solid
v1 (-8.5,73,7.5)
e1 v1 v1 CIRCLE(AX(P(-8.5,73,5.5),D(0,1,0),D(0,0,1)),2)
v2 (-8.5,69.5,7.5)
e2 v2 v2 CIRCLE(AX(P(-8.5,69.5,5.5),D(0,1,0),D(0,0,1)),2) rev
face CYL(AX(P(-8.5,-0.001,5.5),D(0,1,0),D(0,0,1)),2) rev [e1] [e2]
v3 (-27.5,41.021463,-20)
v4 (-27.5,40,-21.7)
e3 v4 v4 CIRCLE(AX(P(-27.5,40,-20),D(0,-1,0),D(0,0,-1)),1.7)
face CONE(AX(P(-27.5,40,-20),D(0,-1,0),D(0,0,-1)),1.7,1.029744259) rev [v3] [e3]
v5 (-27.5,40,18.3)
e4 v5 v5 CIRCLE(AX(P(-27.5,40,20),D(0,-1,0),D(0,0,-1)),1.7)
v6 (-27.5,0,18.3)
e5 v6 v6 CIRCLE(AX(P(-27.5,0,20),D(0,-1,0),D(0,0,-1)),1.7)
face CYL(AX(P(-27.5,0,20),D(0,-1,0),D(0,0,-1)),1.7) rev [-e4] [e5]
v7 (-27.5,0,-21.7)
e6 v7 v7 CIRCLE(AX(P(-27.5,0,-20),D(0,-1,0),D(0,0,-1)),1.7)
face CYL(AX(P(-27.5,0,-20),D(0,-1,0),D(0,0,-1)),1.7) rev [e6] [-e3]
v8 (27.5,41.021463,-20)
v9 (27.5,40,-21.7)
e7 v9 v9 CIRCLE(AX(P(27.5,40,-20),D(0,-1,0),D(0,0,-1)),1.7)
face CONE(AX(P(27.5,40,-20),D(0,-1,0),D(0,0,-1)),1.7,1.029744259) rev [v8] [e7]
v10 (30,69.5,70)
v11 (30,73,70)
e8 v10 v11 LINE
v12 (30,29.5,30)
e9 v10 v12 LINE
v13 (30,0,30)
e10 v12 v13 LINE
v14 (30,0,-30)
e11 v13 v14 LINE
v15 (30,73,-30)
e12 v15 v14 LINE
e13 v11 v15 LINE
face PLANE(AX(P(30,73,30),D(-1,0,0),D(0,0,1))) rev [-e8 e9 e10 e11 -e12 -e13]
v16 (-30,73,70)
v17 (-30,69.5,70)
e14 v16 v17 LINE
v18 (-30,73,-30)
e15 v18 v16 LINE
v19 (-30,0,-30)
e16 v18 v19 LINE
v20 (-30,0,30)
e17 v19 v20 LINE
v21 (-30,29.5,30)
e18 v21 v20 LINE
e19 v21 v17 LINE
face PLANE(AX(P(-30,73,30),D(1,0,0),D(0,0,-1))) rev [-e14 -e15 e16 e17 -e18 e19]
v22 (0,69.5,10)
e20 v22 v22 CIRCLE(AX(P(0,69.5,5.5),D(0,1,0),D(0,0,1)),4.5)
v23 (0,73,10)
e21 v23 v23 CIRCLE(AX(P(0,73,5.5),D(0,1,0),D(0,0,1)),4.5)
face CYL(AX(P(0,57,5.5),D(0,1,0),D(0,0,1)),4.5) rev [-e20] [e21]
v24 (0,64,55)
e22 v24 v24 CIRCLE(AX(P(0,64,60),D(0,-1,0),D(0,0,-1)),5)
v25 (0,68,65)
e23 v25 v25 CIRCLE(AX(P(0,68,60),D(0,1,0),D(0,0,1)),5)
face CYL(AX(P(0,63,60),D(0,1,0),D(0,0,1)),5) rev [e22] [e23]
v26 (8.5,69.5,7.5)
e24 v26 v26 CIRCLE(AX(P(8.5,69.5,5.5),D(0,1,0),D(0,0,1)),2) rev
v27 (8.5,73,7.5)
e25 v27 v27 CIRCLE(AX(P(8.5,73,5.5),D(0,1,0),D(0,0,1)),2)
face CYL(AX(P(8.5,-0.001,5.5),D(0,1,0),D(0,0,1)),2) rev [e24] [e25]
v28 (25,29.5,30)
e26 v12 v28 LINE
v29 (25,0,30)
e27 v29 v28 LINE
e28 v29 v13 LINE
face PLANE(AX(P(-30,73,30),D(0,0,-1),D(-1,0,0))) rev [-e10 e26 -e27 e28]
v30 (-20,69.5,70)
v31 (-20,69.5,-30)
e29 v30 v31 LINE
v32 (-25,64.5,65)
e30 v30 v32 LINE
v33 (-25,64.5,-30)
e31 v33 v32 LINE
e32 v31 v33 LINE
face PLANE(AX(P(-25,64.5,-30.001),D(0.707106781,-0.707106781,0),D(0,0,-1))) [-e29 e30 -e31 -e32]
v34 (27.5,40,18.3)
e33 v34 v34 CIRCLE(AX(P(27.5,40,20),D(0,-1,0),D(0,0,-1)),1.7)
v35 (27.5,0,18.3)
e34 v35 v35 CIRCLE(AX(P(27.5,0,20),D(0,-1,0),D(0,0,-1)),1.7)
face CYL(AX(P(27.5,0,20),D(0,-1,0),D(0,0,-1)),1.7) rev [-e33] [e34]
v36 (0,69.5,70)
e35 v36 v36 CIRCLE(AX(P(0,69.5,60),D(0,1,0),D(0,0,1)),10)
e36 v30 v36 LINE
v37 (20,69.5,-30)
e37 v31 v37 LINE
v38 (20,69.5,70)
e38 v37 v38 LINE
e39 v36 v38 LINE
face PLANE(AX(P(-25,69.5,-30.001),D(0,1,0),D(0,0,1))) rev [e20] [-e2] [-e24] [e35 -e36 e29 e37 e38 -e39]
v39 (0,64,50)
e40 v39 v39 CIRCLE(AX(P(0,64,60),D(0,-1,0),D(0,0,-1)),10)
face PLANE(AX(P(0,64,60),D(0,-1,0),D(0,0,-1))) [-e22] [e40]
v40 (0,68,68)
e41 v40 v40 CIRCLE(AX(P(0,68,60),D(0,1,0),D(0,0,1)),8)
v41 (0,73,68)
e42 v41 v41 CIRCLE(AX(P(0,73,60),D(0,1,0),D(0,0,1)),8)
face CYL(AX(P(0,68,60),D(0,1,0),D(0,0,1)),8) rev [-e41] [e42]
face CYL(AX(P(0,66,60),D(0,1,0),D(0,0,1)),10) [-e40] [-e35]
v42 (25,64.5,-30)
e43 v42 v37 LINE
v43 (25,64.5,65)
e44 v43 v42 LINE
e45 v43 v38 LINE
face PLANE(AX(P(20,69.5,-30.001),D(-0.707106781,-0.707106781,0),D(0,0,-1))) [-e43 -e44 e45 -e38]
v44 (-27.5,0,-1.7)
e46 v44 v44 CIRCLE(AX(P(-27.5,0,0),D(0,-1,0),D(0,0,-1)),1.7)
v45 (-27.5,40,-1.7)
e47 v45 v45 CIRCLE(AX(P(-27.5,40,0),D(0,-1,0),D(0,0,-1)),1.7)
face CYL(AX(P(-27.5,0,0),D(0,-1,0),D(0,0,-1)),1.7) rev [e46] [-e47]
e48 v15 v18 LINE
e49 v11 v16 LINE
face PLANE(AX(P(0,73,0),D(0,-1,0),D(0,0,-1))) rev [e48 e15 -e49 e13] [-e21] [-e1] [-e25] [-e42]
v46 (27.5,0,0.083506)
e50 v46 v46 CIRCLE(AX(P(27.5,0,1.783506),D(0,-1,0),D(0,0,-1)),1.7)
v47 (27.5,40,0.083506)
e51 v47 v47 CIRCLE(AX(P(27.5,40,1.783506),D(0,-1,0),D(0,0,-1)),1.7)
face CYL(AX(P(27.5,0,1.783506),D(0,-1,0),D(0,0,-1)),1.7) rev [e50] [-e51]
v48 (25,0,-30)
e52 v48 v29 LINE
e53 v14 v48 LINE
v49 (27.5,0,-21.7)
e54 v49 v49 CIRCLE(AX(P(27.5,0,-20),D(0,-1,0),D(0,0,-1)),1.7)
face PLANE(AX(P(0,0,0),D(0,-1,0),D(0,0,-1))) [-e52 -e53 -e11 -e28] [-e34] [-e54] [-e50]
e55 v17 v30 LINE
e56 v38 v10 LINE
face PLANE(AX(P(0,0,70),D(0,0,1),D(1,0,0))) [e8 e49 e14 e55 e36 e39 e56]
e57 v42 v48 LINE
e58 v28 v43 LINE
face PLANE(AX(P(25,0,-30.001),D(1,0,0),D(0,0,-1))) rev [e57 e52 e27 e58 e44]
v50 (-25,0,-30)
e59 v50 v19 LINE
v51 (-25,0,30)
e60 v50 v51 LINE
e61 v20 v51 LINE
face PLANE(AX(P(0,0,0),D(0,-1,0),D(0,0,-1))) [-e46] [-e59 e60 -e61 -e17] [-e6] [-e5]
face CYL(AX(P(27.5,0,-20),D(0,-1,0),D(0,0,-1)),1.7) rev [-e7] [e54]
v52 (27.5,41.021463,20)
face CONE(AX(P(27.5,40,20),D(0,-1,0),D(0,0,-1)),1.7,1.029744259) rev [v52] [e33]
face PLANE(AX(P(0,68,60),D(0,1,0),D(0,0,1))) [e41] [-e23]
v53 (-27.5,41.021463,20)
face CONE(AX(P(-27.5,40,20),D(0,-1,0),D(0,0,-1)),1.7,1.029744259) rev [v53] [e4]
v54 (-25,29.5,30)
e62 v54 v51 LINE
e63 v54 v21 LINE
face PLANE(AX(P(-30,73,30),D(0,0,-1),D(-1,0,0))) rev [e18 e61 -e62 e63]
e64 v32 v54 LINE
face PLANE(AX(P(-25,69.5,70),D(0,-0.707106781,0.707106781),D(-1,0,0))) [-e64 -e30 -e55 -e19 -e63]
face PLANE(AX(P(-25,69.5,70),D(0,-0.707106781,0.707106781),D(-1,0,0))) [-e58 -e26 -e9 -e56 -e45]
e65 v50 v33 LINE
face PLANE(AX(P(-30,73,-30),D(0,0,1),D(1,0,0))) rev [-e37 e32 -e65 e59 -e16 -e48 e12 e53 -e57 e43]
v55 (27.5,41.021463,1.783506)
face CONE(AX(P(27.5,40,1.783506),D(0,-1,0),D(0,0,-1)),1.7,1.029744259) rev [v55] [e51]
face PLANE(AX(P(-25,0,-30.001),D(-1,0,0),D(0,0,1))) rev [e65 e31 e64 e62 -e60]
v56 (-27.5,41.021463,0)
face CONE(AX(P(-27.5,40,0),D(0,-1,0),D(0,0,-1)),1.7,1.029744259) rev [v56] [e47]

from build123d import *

# Parameters (mm, degrees)
CROQUIS1_W                       = 60
CROQUIS1_H                       = 60
SALIENTE_EXTRUIR1_DEPTH          = 73
CORTAR_EXTRUIR1_REACH            = 101.141
CROQUIS2_W                       = 50
CROQUIS2_H                       = 69.5
CORTAR_EXTRUIR2_REACH            = 86.433
CROQUIS3_R                       = 2
CHAFL_N1_SIZE                    = 5
TALADRO_DE_MARGEN_PARA_M31_D     = 3.4
TALADRO_DE_MARGEN_PARA_M31_DEPTH = 40
TALADRO_DE_MARGEN_PARA_M31_TIP   = 1.021463052
TALADRO_DE_MARGEN_PARA_M32_D     = 3.4
TALADRO_DE_MARGEN_PARA_M32_DEPTH = 40
TALADRO_DE_MARGEN_PARA_M32_TIP   = 1.021463052
TALADRO_DE_MARGEN_PARA_M33_D     = 3.4
TALADRO_DE_MARGEN_PARA_M33_DEPTH = 40
TALADRO_DE_MARGEN_PARA_M33_TIP   = 1.021463052
CROQUIS11_W                      = 60
CROQUIS11_H                      = 3.5
SALIENTE_EXTRUIR2_DEPTH          = 40
CHAFL_N2_SIZE                    = 40
CORTAR_EXTRUIR3_REACH            = 107.494
CROQUIS12_R                      = 2.5
CROQUIS14_R                      = 10
SALIENTE_EXTRUIR3_DEPTH          = 7
CROQUIS15_R                      = 10
SALIENTE_EXTRUIR4_DEPTH          = 2
CROQUIS13_R                      = 8
CORTAR_EXTRUIR5_DEPTH            = 5
CROQUIS16_R                      = 5
CORTAR_EXTRUIR6_DEPTH            = 5
CROQUIS17_R                      = 4.5
CORTAR_EXTRUIR7_DEPTH            = 16


with BuildPart() as part:
    # Croquis1 → Saliente-Extruir1 (new body)
    with BuildSketch(Plane(origin=(0, 0, 0), x_dir=(1, 0, 0), z_dir=(0, 1, 0))):
        Rectangle(CROQUIS1_W, CROQUIS1_H)
    extrude(amount=SALIENTE_EXTRUIR1_DEPTH)

    # Croquis2 → Cortar-Extruir1 (cut, up to next)
    with BuildSketch(Plane.XY.offset(30), mode=Mode.PRIVATE) as cortar_extruir1_sk1:
        with Locations((0, 34.75)):
            Rectangle(CROQUIS2_W, CROQUIS2_H)
    cortar_extruir1_tool1 = extrude(cortar_extruir1_sk1.sketch, amount=-CORTAR_EXTRUIR1_REACH, mode=Mode.PRIVATE) & part.part
    add(cortar_extruir1_tool1.solids().sort_by_distance((0, 34.75, 30))[0], mode=Mode.SUBTRACT)

    # Croquis3 → Cortar-Extruir2 (cut, up to next)
    with BuildSketch(Plane(origin=(0, 73, 0), x_dir=(1, 0, 0), z_dir=(0, 1, 0)), mode=Mode.PRIVATE) as cortar_extruir2_sk1:
        with Locations(Location((-8.5, -5.5, 0), (0, 0, 270))):
            Circle(CROQUIS3_R)
    cortar_extruir2_tool1 = extrude(cortar_extruir2_sk1.sketch, amount=-CORTAR_EXTRUIR2_REACH, mode=Mode.PRIVATE) & part.part
    # Croquis3 → Cortar-Extruir2 (cut, up to next)
    with BuildSketch(Plane(origin=(0, 73, 0), x_dir=(1, 0, 0), z_dir=(0, 1, 0)), mode=Mode.PRIVATE) as cortar_extruir2_sk2:
        with Locations(Location((8.5, -5.5, 0), (0, 0, 270))):
            Circle(CROQUIS3_R)
    cortar_extruir2_tool2 = extrude(cortar_extruir2_sk2.sketch, amount=-CORTAR_EXTRUIR2_REACH, mode=Mode.PRIVATE) & part.part
    add(cortar_extruir2_tool1.solids().sort_by_distance((-8.5, 73, 5.5))[0], mode=Mode.SUBTRACT)
    add(cortar_extruir2_tool2.solids().sort_by_distance((8.5, 73, 5.5))[0], mode=Mode.SUBTRACT)

    # Chaflán1
    chafl_n1_edges = [part.edges().sort_by_distance(p)[0] for p in [
        (-25, 69.5, 0),
        (25, 69.5, 0),
    ]]
    chamfer(chafl_n1_edges, length=CHAFL_N1_SIZE)

    # Taladro de margen para M31
    with Locations(Plane.XZ):
        with Locations((27.5, -20), (27.5, 20)):
            Hole(TALADRO_DE_MARGEN_PARA_M31_D / 2, depth=TALADRO_DE_MARGEN_PARA_M31_DEPTH)
            with Locations((0, 0, -(TALADRO_DE_MARGEN_PARA_M31_DEPTH + TALADRO_DE_MARGEN_PARA_M31_TIP / 2))):  # 118° drill point
                Cone(0, TALADRO_DE_MARGEN_PARA_M31_D / 2, TALADRO_DE_MARGEN_PARA_M31_TIP, mode=Mode.SUBTRACT)

    # Taladro de margen para M32
    with Locations(Plane.XZ):
        with Locations((-27.5, 20), (-27.5, -20)):
            Hole(TALADRO_DE_MARGEN_PARA_M32_D / 2, depth=TALADRO_DE_MARGEN_PARA_M32_DEPTH)
            with Locations((0, 0, -(TALADRO_DE_MARGEN_PARA_M32_DEPTH + TALADRO_DE_MARGEN_PARA_M32_TIP / 2))):  # 118° drill point
                Cone(0, TALADRO_DE_MARGEN_PARA_M32_D / 2, TALADRO_DE_MARGEN_PARA_M32_TIP, mode=Mode.SUBTRACT)

    # Taladro de margen para M33
    with Locations(Plane.XZ):
        with Locations((-27.5, 0), (27.5, 1.783505525)):
            Hole(TALADRO_DE_MARGEN_PARA_M33_D / 2, depth=TALADRO_DE_MARGEN_PARA_M33_DEPTH)
            with Locations((0, 0, -(TALADRO_DE_MARGEN_PARA_M33_DEPTH + TALADRO_DE_MARGEN_PARA_M33_TIP / 2))):  # 118° drill point
                Cone(0, TALADRO_DE_MARGEN_PARA_M33_D / 2, TALADRO_DE_MARGEN_PARA_M33_TIP, mode=Mode.SUBTRACT)

    # Croquis11 → Saliente-Extruir2 (add)
    with BuildSketch(Plane.XY.offset(30)):
        with Locations((0, 71.25)):
            Rectangle(CROQUIS11_W, CROQUIS11_H)
    extrude(amount=SALIENTE_EXTRUIR2_DEPTH)

    # Chaflán2
    # the kernel refuses this chamfer: 40 mm, written as the material it adds along each edge
    with BuildSketch(Plane(origin=(30, 69.5, 30), x_dir=(0, -0.9996219169112968, -0.027495876610586403), z_dir=(-1, 0, 0))) as chafl_n2_piece_1_section:
        Polygon((CHAFL_N2_SIZE * 0.999621916911, CHAFL_N2_SIZE * 0.0274958766106), (-CHAFL_N2_SIZE * 0.0274958766106, CHAFL_N2_SIZE * 0.999621916911), (0, 0), align=None)
    chafl_n2_piece_1 = extrude(amount=112.867319519, mode=Mode.PRIVATE)
    chafl_n2_piece_1 = split(chafl_n2_piece_1, bisect_by=Plane(origin=(25, 65.769230769, 48.134615385), z_dir=(1, 0, 0)), keep=Keep.TOP, mode=Mode.PRIVATE)
    add(chafl_n2_piece_1)
    with BuildSketch(Plane(origin=(132.867319519, 69.5, 30), x_dir=(0, -0.9996219169112968, -0.027495876610586403), z_dir=(-1, 0, 0))) as chafl_n2_piece_2_section:
        Polygon((CHAFL_N2_SIZE * 0.999621916911, CHAFL_N2_SIZE * 0.0274958766106), (-CHAFL_N2_SIZE * 0.0274958766106, CHAFL_N2_SIZE * 0.999621916911), (0, 0), align=None)
    chafl_n2_piece_2 = extrude(amount=215.734639037, mode=Mode.PRIVATE)
    chafl_n2_piece_2 = split(chafl_n2_piece_2, bisect_by=Plane(origin=(22.472826087, 67.027173913, 49.184782609), z_dir=(0.7071067811865476, 0.7071067811865476, 0)), keep=Keep.TOP, mode=Mode.PRIVATE)
    chafl_n2_piece_2 = split(chafl_n2_piece_2, bisect_by=Plane(origin=(25, 67.869565217, 49.184782609), z_dir=(-1, 0, 0)), keep=Keep.TOP, mode=Mode.PRIVATE)
    add(chafl_n2_piece_2)
    with BuildSketch(Plane(origin=(132.867319519, 69.5, 30), x_dir=(0, -0.9996219169112968, -0.027495876610586403), z_dir=(-1, 0, 0))) as chafl_n2_piece_3_section:
        Polygon((CHAFL_N2_SIZE * 0.999621916911, CHAFL_N2_SIZE * 0.0274958766106), (-CHAFL_N2_SIZE * 0.0274958766106, CHAFL_N2_SIZE * 0.999621916911), (0, 0), align=None)
    chafl_n2_piece_3 = extrude(amount=215.734639037, mode=Mode.PRIVATE)
    chafl_n2_piece_3 = split(chafl_n2_piece_3, bisect_by=Plane(origin=(-30, 67.869565217, 49.184782609), z_dir=(1, 0, 0)), keep=Keep.TOP, mode=Mode.PRIVATE)
    chafl_n2_piece_3 = split(chafl_n2_piece_3, bisect_by=Plane(origin=(-22.472826087, 67.027173913, 49.184782609), z_dir=(-0.7071067811865476, 0.7071067811865476, 0)), keep=Keep.TOP, mode=Mode.PRIVATE)
    add(chafl_n2_piece_3)
    with BuildSketch(Plane(origin=(132.867319519, 69.5, 30), x_dir=(0, -0.9996219169112968, -0.027495876610586403), z_dir=(-1, 0, 0))) as chafl_n2_piece_4_section:
        Polygon((CHAFL_N2_SIZE * 0.999621916911, CHAFL_N2_SIZE * 0.0274958766106), (-CHAFL_N2_SIZE * 0.0274958766106, CHAFL_N2_SIZE * 0.999621916911), (0, 0), align=None)
    chafl_n2_piece_4 = extrude(amount=215.734639037, mode=Mode.PRIVATE)
    chafl_n2_piece_4 = split(chafl_n2_piece_4, bisect_by=Plane(origin=(-25, 51.251968504, 40.875984252), z_dir=(-1, 0, 0)), keep=Keep.TOP, mode=Mode.PRIVATE)
    chafl_n2_piece_4 = split(chafl_n2_piece_4, bisect_by=Plane(origin=(-30, 51.251968504, 40.875984252), z_dir=(1, 0, 0)), keep=Keep.TOP, mode=Mode.PRIVATE)
    add(chafl_n2_piece_4)
    with BuildSketch(Plane(origin=(82.867319519, 69.5, 30), x_dir=(0, -0.9996219169112968, -0.027495876610586403), z_dir=(-1, 0, 0))) as chafl_n2_piece_5_section:
        Polygon((CHAFL_N2_SIZE * 0.999621916911, CHAFL_N2_SIZE * 0.0274958766106), (-CHAFL_N2_SIZE * 0.0274958766106, CHAFL_N2_SIZE * 0.999621916911), (0, 0), align=None)
    chafl_n2_piece_5 = extrude(amount=215.734639037, mode=Mode.PRIVATE)
    chafl_n2_piece_5 = split(chafl_n2_piece_5, bisect_by=Plane(origin=(30, 65.769230769, 48.134615385), z_dir=(-1, 0, 0)), keep=Keep.TOP, mode=Mode.PRIVATE)
    chafl_n2_piece_5 = split(chafl_n2_piece_5, bisect_by=Plane(origin=(25, 65.769230769, 48.134615385), z_dir=(1, 0, 0)), keep=Keep.TOP, mode=Mode.PRIVATE)
    add(chafl_n2_piece_5)
    with BuildSketch(Plane(origin=(82.867319519, 69.5, 30), x_dir=(0, -0.9996219169112968, -0.027495876610586403), z_dir=(-1, 0, 0))) as chafl_n2_piece_6_section:
        Polygon((CHAFL_N2_SIZE * 0.999621916911, CHAFL_N2_SIZE * 0.0274958766106), (-CHAFL_N2_SIZE * 0.0274958766106, CHAFL_N2_SIZE * 0.999621916911), (0, 0), align=None)
    chafl_n2_piece_6 = extrude(amount=215.734639037, mode=Mode.PRIVATE)
    chafl_n2_piece_6 = split(chafl_n2_piece_6, bisect_by=Plane(origin=(22.472826087, 67.027173913, 49.184782609), z_dir=(0.7071067811865476, 0.7071067811865476, 0)), keep=Keep.TOP, mode=Mode.PRIVATE)
    chafl_n2_piece_6 = split(chafl_n2_piece_6, bisect_by=Plane(origin=(25, 67.869565217, 49.184782609), z_dir=(-1, 0, 0)), keep=Keep.TOP, mode=Mode.PRIVATE)
    add(chafl_n2_piece_6)
    with BuildSketch(Plane(origin=(82.867319519, 69.5, 30), x_dir=(0, -0.9996219169112968, -0.027495876610586403), z_dir=(-1, 0, 0))) as chafl_n2_piece_7_section:
        Polygon((CHAFL_N2_SIZE * 0.999621916911, CHAFL_N2_SIZE * 0.0274958766106), (-CHAFL_N2_SIZE * 0.0274958766106, CHAFL_N2_SIZE * 0.999621916911), (0, 0), align=None)
    chafl_n2_piece_7 = extrude(amount=112.867319519, mode=Mode.PRIVATE)
    chafl_n2_piece_7 = split(chafl_n2_piece_7, bisect_by=Plane(origin=(-22.472826087, 67.027173913, 49.184782609), z_dir=(-0.7071067811865476, 0.7071067811865476, 0)), keep=Keep.TOP, mode=Mode.PRIVATE)
    add(chafl_n2_piece_7)
    with BuildSketch(Plane(origin=(82.867319519, 69.5, 30), x_dir=(0, -0.9996219169112968, -0.027495876610586403), z_dir=(-1, 0, 0))) as chafl_n2_piece_8_section:
        Polygon((CHAFL_N2_SIZE * 0.999621916911, CHAFL_N2_SIZE * 0.0274958766106), (-CHAFL_N2_SIZE * 0.0274958766106, CHAFL_N2_SIZE * 0.999621916911), (0, 0), align=None)
    chafl_n2_piece_8 = extrude(amount=112.867319519, mode=Mode.PRIVATE)
    chafl_n2_piece_8 = split(chafl_n2_piece_8, bisect_by=Plane(origin=(-25, 51.251968504, 40.875984252), z_dir=(-1, 0, 0)), keep=Keep.TOP, mode=Mode.PRIVATE)
    add(chafl_n2_piece_8)

    # Croquis12 → Cortar-Extruir3 (cut, up to next)
    with BuildSketch(Plane(origin=(0, 73, 0), x_dir=(1, 0, 0), z_dir=(0, 1, 0)), mode=Mode.PRIVATE) as cortar_extruir3_sk1:
        with Locations(Location((0, -60, 0), (0, 0, 270))):
            Circle(CROQUIS12_R)
    cortar_extruir3_tool1 = extrude(cortar_extruir3_sk1.sketch, amount=-CORTAR_EXTRUIR3_REACH, mode=Mode.PRIVATE) & part.part
    add(cortar_extruir3_tool1.solids().sort_by_distance((0, 73, 60))[0], mode=Mode.SUBTRACT)

    # Croquis14 → Saliente-Extruir3 (add)
    with BuildSketch(Plane(origin=(0, 73, 0), x_dir=(1, 0, 0), z_dir=(0, 1, 0))):
        with Locations(Location((0, -60, 0), (0, 0, 270))):
            Circle(CROQUIS14_R)
    extrude(amount=-SALIENTE_EXTRUIR3_DEPTH)

    # Croquis15 → Saliente-Extruir4 (add)
    with BuildSketch(Plane.XZ.offset(-66)):
        with Locations(Location((0, 60, 0), (0, 0, 90))):
            Circle(CROQUIS15_R)
    extrude(amount=SALIENTE_EXTRUIR4_DEPTH)

    # Croquis13 → Cortar-Extruir5 (cut)
    with BuildSketch(Plane(origin=(0, 73, 0), x_dir=(1, 0, 0), z_dir=(0, 1, 0))):
        with Locations(Location((0, -60, 0), (0, 0, 270))):
            Circle(CROQUIS13_R)
    extrude(amount=-CORTAR_EXTRUIR5_DEPTH, mode=Mode.SUBTRACT)

    # Croquis16 → Cortar-Extruir6 (cut)
    with BuildSketch(Plane(origin=(0, 68, 0), x_dir=(1, 0, 0), z_dir=(0, 1, 0))):
        with Locations(Location((0, -60, 0), (0, 0, 270))):
            Circle(CROQUIS16_R)
    extrude(amount=-CORTAR_EXTRUIR6_DEPTH, mode=Mode.SUBTRACT)

    # Croquis17 → Cortar-Extruir7 (cut)
    with BuildSketch(Plane(origin=(0, 73, 0), x_dir=(1, 0, 0), z_dir=(0, 1, 0))):
        with Locations(Location((0, -5.5, 0), (0, 0, 270))):
            Circle(CROQUIS17_R)
    extrude(amount=-CORTAR_EXTRUIR7_DEPTH, mode=Mode.SUBTRACT)


solid = part.part
